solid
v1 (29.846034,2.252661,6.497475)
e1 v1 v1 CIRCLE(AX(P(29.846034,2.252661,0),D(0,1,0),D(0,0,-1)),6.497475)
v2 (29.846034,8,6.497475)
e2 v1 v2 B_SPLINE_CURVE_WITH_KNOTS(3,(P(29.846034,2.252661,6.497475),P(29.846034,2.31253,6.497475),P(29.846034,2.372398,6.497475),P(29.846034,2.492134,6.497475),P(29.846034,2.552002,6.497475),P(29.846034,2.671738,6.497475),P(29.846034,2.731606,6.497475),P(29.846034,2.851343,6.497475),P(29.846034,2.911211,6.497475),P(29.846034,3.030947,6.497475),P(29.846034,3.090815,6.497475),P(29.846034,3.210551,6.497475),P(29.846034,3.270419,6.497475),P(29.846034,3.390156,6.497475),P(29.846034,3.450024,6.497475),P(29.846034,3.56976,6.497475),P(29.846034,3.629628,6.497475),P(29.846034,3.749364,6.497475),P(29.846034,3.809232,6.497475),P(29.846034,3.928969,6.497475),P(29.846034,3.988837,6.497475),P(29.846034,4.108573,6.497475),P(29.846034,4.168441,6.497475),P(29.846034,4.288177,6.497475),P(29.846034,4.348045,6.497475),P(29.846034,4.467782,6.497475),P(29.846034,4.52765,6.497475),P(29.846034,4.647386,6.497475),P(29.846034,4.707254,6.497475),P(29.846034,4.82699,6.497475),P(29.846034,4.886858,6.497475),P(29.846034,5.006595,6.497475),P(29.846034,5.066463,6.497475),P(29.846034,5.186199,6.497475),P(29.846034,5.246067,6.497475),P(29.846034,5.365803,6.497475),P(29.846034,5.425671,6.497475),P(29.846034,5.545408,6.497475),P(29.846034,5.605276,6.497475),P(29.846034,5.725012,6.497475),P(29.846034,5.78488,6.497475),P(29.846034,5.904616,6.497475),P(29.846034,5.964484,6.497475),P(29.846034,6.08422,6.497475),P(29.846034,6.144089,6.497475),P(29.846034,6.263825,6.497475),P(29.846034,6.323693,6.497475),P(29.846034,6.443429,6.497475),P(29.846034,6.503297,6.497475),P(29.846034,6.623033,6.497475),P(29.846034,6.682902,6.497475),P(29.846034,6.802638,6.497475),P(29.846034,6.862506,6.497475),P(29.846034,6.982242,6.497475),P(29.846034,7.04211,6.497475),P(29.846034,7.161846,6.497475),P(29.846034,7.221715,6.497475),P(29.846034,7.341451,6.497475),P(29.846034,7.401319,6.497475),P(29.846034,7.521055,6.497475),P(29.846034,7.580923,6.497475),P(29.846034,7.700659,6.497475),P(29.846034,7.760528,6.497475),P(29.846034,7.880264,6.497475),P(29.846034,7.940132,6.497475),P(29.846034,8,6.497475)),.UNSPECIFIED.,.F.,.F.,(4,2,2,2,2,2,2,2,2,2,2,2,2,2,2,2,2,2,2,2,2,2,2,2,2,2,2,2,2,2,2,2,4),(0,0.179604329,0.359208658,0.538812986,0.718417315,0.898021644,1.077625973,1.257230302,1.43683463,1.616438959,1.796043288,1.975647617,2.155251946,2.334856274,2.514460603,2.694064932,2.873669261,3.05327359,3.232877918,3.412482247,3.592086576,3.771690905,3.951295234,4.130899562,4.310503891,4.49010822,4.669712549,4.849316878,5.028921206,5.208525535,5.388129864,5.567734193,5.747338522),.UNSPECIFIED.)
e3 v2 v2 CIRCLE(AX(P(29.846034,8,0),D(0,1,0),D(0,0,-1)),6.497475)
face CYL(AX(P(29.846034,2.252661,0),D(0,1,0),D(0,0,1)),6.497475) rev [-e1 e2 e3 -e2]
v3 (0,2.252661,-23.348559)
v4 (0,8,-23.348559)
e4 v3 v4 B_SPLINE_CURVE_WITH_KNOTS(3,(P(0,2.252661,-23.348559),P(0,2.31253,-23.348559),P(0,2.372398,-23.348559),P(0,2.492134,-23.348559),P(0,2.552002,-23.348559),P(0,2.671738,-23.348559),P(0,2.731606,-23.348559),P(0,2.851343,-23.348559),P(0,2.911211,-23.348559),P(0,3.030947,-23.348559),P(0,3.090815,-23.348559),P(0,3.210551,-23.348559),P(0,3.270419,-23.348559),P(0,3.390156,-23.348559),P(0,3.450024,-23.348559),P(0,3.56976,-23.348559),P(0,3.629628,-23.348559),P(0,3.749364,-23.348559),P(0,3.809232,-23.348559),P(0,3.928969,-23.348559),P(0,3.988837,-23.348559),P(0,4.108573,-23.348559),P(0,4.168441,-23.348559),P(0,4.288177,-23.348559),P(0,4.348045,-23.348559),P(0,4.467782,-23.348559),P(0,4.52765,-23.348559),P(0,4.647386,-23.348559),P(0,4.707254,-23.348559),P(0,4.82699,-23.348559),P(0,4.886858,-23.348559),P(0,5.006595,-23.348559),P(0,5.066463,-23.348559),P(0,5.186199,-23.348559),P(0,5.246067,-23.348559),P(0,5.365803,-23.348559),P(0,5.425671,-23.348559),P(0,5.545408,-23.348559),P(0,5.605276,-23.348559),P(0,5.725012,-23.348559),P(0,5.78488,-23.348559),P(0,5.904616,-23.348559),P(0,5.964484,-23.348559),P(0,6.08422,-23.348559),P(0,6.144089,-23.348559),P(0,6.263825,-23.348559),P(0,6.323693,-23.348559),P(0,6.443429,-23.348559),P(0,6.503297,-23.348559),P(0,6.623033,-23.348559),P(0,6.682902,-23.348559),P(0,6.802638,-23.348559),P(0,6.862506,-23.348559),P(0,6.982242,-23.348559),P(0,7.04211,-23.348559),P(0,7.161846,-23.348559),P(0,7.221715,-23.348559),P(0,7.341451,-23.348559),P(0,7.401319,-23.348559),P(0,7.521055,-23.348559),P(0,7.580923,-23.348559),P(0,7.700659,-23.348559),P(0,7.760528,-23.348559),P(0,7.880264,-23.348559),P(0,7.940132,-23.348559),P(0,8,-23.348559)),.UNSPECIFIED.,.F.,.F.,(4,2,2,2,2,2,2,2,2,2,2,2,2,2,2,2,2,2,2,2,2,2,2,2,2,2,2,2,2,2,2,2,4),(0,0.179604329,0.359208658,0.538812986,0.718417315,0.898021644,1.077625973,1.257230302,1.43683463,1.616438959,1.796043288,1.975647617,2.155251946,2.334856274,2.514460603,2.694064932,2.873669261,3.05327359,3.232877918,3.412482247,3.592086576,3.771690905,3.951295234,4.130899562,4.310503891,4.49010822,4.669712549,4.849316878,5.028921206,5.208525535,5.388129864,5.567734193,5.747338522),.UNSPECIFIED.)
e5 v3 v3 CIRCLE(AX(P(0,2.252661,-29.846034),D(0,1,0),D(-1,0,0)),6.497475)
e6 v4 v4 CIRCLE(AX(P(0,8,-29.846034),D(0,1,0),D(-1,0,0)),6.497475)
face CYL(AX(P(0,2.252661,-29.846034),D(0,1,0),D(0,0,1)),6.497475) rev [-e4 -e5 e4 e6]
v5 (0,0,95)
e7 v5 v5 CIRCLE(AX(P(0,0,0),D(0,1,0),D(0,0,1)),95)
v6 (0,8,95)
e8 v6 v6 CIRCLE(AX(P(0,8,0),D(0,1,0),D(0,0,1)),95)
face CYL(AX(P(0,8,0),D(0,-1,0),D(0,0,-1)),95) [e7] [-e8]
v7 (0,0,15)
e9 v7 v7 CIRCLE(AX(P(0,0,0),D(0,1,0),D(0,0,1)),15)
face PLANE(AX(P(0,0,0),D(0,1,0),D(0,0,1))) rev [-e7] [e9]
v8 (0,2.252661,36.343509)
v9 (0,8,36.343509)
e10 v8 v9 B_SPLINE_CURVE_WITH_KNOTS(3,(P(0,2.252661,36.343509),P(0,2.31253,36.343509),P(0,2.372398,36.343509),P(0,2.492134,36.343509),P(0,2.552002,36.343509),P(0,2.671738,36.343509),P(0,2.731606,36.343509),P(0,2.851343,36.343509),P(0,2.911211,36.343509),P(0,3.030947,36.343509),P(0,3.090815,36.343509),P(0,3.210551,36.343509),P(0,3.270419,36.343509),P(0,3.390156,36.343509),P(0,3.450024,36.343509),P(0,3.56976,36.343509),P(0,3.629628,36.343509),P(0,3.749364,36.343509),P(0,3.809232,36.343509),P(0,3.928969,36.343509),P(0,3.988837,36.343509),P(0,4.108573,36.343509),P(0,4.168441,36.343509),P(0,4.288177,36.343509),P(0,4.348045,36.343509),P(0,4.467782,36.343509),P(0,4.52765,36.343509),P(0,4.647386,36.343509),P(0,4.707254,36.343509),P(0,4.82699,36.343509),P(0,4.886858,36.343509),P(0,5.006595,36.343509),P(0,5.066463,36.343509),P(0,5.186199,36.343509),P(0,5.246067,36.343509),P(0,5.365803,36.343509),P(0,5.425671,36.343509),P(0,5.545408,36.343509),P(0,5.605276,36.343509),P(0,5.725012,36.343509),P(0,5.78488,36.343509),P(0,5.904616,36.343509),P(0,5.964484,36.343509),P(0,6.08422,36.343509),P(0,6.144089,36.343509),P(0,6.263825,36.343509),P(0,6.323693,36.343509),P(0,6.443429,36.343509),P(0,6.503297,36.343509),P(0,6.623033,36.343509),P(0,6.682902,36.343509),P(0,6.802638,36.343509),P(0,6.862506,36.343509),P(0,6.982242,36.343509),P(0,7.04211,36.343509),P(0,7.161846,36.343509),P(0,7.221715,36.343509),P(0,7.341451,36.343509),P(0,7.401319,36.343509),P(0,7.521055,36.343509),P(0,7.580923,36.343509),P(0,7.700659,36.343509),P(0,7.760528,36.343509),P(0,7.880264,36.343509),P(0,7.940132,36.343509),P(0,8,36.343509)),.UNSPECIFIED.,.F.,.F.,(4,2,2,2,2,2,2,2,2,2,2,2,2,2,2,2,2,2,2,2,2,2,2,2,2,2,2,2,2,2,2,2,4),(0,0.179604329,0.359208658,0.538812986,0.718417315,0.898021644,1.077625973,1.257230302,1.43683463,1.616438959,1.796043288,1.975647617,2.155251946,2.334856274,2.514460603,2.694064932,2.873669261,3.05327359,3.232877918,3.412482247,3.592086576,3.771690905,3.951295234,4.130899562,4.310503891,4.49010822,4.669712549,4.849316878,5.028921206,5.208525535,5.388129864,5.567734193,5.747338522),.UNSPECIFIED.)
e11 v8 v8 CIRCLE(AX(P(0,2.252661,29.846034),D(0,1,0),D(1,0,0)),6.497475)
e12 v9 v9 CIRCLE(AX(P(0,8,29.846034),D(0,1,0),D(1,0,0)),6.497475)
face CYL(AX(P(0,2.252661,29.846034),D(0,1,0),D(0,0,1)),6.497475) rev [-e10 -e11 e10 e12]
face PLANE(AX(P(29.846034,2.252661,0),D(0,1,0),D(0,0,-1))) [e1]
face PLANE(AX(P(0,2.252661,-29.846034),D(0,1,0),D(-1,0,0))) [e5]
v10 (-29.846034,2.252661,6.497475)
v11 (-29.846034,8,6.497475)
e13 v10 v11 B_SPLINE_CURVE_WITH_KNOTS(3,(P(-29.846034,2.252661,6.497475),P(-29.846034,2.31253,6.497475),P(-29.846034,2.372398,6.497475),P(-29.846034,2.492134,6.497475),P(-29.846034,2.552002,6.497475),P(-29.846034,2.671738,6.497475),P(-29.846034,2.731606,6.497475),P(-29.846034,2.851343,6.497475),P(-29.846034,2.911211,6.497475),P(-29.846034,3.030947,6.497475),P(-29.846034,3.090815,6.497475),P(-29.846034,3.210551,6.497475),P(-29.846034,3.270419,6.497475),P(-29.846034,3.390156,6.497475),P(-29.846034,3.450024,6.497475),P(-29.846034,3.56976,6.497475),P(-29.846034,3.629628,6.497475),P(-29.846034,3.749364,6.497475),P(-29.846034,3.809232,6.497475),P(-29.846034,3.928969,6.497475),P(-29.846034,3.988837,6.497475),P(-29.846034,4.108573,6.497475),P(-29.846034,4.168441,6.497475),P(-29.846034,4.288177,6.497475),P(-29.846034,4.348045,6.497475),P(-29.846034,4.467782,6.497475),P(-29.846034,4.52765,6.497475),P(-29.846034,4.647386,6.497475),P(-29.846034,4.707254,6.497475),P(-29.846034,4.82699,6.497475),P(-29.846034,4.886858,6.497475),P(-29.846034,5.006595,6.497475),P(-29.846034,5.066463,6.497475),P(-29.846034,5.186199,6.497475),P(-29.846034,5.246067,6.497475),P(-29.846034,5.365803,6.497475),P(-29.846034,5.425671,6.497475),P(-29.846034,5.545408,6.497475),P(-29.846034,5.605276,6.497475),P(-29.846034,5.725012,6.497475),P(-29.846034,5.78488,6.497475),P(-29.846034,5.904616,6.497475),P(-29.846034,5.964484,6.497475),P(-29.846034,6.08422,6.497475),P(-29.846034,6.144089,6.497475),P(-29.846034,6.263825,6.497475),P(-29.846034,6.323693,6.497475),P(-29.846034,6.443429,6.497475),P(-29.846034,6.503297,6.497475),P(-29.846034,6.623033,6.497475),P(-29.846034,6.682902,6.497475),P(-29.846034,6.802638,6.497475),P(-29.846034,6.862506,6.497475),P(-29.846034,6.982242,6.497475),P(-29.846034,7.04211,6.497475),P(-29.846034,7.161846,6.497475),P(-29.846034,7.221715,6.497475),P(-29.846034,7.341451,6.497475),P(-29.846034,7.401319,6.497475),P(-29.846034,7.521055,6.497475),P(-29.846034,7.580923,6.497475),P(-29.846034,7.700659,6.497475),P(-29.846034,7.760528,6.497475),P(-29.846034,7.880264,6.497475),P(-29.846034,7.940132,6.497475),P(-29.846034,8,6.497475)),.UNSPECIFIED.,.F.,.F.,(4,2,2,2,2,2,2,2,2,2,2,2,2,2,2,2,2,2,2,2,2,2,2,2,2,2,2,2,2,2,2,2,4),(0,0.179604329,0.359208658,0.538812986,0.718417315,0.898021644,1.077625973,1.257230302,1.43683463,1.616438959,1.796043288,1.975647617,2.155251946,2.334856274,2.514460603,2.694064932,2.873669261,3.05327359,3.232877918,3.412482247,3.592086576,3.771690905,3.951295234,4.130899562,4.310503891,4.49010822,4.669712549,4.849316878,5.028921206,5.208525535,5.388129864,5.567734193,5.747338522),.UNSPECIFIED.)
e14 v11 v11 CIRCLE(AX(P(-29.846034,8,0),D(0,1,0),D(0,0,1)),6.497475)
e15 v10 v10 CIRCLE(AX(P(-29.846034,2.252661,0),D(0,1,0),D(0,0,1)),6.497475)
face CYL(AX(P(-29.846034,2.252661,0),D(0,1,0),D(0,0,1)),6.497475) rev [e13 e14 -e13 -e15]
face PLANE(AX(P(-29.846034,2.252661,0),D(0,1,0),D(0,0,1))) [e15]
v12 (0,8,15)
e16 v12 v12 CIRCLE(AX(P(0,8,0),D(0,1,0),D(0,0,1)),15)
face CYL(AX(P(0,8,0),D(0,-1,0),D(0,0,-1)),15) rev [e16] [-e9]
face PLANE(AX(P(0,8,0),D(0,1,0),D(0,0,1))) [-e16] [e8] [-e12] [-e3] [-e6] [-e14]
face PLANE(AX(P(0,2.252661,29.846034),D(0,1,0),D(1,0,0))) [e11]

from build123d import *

# Parameters (mm, degrees)
SKETCH1_R           = 95
BOSS_EXTRUDE1_DEPTH = 8
SKETCH2_R           = 15
CUT_EXTRUDE1_DEPTH  = 135.588261004
SKETCH3_R           = 6.497474884
CUT_EXTRUDE2_DEPTH  = 5.747338522
CIRPATTERN1_COUNT   = 4


with BuildPart() as part:
    # Sketch1 → Boss-Extrude1 (new body)
    with BuildSketch(Plane(origin=(0, 0, 0), x_dir=(1, 0, 0), z_dir=(0, 1, 0))):
        Circle(SKETCH1_R)
    extrude(amount=BOSS_EXTRUDE1_DEPTH)

    # Sketch2 → Cut-Extrude1 (cut, through all)
    with BuildSketch(Plane(origin=(0, 0, 0), x_dir=(1, 0, 0), z_dir=(0, 1, 0))):
        Circle(SKETCH2_R)
    extrude(amount=CUT_EXTRUDE1_DEPTH, mode=Mode.SUBTRACT)

    # Sketch3 → Cut-Extrude2 (cut)
    with BuildSketch(Plane(origin=(0, 8, 0), x_dir=(1, 0, 0), z_dir=(0, 1, 0))):
        with Locations((-29.846033935, 0)):
            Circle(SKETCH3_R)
    cut_extrude2 = extrude(amount=-CUT_EXTRUDE2_DEPTH, mode=Mode.SUBTRACT)

    # CirPattern1: Cut-Extrude2 ×4 about axis
    cirpattern1_axis = Axis((0, 0, 0), (0, 1, 0))
    for i in range(1, CIRPATTERN1_COUNT):
        add(cut_extrude2.rotate(cirpattern1_axis, i * 360 / CIRPATTERN1_COUNT), mode=Mode.SUBTRACT)


solid = part.part
